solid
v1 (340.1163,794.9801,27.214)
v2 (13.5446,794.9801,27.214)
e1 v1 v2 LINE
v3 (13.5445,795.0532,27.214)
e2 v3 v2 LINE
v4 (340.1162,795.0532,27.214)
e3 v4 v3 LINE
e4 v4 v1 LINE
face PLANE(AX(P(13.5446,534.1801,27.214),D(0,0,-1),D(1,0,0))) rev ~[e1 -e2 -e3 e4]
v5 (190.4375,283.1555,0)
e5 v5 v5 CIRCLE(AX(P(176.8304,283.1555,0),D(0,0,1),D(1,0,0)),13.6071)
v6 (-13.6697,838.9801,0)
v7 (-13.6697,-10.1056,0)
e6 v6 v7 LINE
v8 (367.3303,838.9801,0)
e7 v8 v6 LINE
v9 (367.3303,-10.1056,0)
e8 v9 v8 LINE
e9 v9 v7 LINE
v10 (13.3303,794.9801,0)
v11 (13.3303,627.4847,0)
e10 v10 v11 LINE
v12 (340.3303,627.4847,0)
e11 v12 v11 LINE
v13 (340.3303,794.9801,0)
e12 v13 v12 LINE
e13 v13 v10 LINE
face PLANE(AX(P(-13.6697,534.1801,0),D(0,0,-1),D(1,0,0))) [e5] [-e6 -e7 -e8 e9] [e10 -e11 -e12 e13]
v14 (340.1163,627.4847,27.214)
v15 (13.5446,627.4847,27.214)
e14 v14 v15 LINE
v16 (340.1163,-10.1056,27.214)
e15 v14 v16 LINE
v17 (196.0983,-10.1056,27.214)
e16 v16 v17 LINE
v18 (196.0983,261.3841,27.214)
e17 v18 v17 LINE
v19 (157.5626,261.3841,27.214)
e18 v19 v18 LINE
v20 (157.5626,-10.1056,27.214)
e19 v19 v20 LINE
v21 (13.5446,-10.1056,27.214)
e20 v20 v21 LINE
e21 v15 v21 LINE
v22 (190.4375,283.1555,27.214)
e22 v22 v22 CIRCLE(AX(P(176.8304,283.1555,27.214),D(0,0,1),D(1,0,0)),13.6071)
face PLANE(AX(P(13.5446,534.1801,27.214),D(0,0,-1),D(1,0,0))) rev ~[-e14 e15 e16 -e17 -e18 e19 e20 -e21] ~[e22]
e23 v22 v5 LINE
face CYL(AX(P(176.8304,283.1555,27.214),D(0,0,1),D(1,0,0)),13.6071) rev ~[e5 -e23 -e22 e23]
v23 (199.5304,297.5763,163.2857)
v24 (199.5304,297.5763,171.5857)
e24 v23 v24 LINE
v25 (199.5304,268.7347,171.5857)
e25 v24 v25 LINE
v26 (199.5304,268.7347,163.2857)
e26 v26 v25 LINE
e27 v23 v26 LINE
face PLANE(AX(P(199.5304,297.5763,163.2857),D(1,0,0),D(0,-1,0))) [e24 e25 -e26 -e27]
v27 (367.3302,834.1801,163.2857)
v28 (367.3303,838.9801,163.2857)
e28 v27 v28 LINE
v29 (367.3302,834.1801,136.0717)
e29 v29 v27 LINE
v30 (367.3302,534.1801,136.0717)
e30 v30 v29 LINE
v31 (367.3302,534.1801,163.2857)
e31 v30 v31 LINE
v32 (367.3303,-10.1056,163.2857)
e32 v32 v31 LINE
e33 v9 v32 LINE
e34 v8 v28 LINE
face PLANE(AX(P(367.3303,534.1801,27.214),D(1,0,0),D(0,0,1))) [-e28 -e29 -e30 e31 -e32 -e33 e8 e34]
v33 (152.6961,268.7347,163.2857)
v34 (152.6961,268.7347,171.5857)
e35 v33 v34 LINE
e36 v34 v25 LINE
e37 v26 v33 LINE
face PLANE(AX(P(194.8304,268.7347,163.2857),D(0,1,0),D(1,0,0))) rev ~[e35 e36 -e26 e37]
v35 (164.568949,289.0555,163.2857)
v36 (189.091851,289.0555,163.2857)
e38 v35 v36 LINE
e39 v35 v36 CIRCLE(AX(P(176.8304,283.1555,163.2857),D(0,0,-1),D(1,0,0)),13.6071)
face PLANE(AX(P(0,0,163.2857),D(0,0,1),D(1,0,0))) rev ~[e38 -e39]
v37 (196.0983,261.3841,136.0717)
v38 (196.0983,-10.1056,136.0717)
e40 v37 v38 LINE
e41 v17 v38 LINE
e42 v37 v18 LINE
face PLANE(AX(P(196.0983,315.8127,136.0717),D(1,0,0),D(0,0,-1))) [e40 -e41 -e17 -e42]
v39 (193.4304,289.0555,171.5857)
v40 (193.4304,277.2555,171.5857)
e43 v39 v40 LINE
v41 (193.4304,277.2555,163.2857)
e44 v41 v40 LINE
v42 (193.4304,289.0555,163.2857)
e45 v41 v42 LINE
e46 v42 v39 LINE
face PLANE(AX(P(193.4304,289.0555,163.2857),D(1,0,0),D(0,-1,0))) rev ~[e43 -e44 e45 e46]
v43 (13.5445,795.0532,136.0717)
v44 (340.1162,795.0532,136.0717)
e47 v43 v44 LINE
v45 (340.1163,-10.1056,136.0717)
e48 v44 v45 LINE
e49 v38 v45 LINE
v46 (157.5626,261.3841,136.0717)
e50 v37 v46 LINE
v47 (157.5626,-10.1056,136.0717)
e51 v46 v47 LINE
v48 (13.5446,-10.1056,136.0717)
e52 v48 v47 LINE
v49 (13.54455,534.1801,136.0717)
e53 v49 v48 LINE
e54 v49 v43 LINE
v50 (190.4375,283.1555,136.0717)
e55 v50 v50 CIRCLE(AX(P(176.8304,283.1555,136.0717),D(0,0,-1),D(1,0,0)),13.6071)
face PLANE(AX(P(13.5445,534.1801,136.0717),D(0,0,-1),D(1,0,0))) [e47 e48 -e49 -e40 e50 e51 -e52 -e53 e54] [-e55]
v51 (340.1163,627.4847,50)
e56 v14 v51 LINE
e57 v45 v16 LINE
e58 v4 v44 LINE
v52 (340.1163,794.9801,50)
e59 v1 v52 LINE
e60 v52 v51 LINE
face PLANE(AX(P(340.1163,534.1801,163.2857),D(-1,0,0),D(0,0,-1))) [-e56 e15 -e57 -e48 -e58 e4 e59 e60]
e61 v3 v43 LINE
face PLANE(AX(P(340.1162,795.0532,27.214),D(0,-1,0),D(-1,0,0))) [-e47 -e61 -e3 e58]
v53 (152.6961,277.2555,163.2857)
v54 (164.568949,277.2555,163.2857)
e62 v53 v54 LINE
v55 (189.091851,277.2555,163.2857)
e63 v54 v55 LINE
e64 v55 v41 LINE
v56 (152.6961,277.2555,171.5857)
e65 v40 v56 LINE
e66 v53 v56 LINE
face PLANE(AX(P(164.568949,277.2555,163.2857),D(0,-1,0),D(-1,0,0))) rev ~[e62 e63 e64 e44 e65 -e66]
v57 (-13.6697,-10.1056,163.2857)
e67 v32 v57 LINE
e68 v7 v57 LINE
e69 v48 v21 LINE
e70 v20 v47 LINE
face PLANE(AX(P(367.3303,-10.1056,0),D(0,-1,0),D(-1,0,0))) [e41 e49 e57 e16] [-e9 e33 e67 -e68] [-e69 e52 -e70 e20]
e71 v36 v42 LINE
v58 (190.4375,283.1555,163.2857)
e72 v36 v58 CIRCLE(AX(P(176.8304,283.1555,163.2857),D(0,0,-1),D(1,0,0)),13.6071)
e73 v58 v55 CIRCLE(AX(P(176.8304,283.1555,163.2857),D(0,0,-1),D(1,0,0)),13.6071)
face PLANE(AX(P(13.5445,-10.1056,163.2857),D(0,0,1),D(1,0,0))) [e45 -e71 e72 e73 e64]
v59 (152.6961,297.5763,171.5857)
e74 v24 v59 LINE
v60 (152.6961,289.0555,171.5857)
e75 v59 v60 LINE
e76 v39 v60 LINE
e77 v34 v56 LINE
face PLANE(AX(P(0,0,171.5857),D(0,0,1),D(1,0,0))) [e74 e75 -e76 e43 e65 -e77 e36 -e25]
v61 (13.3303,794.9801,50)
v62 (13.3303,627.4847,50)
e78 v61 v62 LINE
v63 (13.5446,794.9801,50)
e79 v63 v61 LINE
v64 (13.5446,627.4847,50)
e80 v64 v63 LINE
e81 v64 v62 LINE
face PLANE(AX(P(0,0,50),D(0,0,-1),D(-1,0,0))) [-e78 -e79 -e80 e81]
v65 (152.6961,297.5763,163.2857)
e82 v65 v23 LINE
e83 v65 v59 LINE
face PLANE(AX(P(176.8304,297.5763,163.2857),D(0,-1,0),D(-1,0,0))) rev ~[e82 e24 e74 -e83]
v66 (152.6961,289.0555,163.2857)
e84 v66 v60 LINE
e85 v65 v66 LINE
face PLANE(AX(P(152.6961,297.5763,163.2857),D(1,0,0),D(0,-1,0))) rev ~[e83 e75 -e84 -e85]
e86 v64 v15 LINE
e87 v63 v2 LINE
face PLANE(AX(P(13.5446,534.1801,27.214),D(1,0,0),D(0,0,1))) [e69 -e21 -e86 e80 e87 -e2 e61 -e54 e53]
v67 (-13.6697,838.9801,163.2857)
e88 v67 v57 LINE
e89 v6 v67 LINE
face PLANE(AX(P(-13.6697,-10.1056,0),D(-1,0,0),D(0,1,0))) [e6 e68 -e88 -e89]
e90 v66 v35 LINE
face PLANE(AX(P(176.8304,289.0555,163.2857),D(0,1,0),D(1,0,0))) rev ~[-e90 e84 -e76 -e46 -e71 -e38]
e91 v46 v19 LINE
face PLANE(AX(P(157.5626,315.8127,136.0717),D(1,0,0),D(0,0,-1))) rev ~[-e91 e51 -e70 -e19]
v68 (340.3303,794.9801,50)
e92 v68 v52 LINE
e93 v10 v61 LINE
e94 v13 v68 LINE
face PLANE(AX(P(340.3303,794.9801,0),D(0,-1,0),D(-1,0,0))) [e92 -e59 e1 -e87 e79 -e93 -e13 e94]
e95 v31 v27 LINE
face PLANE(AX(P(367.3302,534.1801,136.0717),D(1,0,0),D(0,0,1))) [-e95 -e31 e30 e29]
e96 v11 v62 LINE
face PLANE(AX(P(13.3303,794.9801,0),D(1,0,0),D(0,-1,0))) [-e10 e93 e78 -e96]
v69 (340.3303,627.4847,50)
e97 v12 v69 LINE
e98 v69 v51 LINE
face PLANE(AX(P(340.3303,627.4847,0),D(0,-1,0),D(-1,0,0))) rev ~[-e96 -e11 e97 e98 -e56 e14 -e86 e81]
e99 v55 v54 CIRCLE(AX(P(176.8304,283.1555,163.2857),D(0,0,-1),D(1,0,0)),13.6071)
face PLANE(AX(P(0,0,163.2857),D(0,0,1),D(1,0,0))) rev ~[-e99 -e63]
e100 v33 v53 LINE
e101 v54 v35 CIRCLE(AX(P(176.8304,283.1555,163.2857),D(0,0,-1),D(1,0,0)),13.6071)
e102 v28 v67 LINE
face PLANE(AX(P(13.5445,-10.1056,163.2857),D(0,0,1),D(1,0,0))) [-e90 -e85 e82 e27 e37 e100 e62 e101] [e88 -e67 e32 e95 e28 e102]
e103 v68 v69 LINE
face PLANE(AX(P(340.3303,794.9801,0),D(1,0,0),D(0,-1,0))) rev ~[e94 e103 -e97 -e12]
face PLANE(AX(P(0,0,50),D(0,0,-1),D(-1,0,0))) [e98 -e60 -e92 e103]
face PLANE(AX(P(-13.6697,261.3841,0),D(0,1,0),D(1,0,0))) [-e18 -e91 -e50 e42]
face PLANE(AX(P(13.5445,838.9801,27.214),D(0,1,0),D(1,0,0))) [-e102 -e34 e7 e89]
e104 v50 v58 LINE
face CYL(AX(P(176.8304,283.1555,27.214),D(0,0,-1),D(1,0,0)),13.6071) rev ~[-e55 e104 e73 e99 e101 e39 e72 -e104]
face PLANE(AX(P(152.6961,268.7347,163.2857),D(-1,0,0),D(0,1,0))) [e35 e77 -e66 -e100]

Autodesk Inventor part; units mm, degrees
ref_plane "YZ Plane" through (0, 0, 0) normal (1, 0, 0) x (0, 1, 0)
ref_plane "XZ Plane" through (0, 0, 0) normal (0, 1, 0) x (-1, 0, 0)
ref_plane "XY Plane" through (0, 0, 0) normal (0, 0, 1) x (1, 0, 0)
sketch "Sketch1" plane through (0, 0, 0) normal (0, 0, 1) x (1, 0, 0)
  line L0 (-13.6697, 534.1801) -> (367.3303, 534.1801)
  line L1 (367.3303, 534.1801) -> (367.3303, -10.1056)
  line L2 (367.3303, -10.1056) -> (-13.6697, -10.1056)
  line L3 (-13.6697, -10.1056) -> (-13.6697, 534.1801)
  point P0 (0, 0)
  dimension "d0" = 381
  dimension "d1" = 544.2857
extrude "Extrusion1" add sketch "Sketch1" along normal blind 163.2857
sketch "Sketch2" plane through (-13.6697, 534.1801, 0) normal (0, 1, 0) x (1, 0, 0)
  line L0 (27.2143, -136.0717) -> (353.786, -136.0717)
  line L1 (353.786, -136.0717) -> (353.786, -27.214)
  line L2 (353.786, -27.214) -> (27.2143, -27.214)
  line L3 (27.2143, -27.214) -> (27.2143, -136.0717)
  line L4 (0, 0) -> (0, -163.2857) projected
  line L5 (381, 0) -> (0, 0) projected
  line L6 (381, 0) -> (381, -163.2857) projected
  line L7 (381, -163.2857) -> (0, -163.2857) projected
  point P0 (13.6697, 0)
  dimension "d4" = 27.2143
  dimension "d5" = 27.214
  dimension "d6" = 27.214
  dimension "d7" = 27.214
extrude "Extrusion2" cut sketch "Sketch2" against normal blind 218.3674 contours L3 L2 L1 L0
sketch "Sketch3" plane through (-13.6697, 315.8127, 0) normal (0, 1, 0) x (1, 0, 0)
  line L0 (353.786, -27.214) -> (353.786, -136.0717) projected
  line L1 (27.2143, -27.214) -> (353.786, -27.214) projected
  line L2 (353.786, -136.0717) -> (209.768, -136.0717)
  line L3 (209.768, -136.0717) -> (209.768, -27.214)
  line L4 (209.768, -27.214) -> (353.786, -27.214)
  line L5 (353.786, -27.214) -> (353.786, -136.0717)
  line L6 (353.786, -136.0717) -> (27.2143, -136.0717) projected
  line L7 (27.2143, -136.0717) -> (171.2323, -136.0717)
  line L8 (171.2323, -136.0717) -> (171.2323, -27.214)
  line L9 (171.2323, -27.214) -> (27.2143, -27.214)
  line L10 (27.2143, -27.214) -> (27.2143, -136.0717)
  point P0 (13.6697, 0)
  point P1 (27.2143, -27.214)
  point P2 (171.2323, -27.214)
  dimension "d10" = 144.018
  dimension "d11" = 144.018
extrude "Extrusion3" cut sketch "Sketch3" against normal blind 436.0817 contours L0 L2 L3 L1 | L8 L6 L10 L1
sketch "Sketch4" plane through (-13.6697, 315.8127, 0) normal (0, 1, 0) x (1, 0, 0)
  line L0 (171.2323, -27.214) -> (209.768, -27.214) projected
  line L1 (209.768, -136.0717) -> (209.768, -27.214) projected
  line L2 (171.2323, -27.214) -> (209.768, -27.214)
  line L3 (209.768, -27.214) -> (209.768, -136.0717)
  line L4 (209.768, -136.0717) -> (171.2323, -136.0717)
  line L5 (171.2323, -136.0717) -> (171.2323, -27.214)
  point P0 (13.6697, 0)
extrude "Extrusion4" cut sketch "Sketch4" against normal blind 54.4286
sketch "Sketch5" plane through (13.5445, 534.1801, 27.214) normal (0, 0, 1) x (1, 0, 0)
  line L0 (144.018, -272.796) -> (182.5537, -272.796) projected
  line L1 (163.2859, -272.796) -> (163.2859, -37.2995) construction
  circle A0 centre (163.2859, -251.0246) radius 13.6071
  point P0 (-13.5445, -534.1801)
  dimension "d16" = 27.2143
  dimension "d17" = 21.7714
extrude "Extrusion5" cut sketch "Sketch5" along normal mid plane 489.8571
sketch "Sketch6" plane through (-13.6697, 534.1801, 0) normal (0, 1, 0) x (1, 0, 0)
  line L0 (381, -163.2857) -> (0, -163.2857) projected
  line L1 (0, 0) -> (0, -163.2857) projected
  line L2 (27.2143, -163.2857) -> (0, -163.2857)
  line L3 (0, -163.2857) -> (0, 0)
  line L4 (0, 0) -> (26.8469, 0)
  line L5 (27.2143, -27.214) -> (27.2143, -163.2857)
  line L6 (27.2143, -27.214) -> (353.786, -27.214) projected
  line L7 (381, 0) -> (381, -163.2857) projected
  line L8 (27.2143, -27.214) -> (353.786, -27.214)
  line L9 (381, -27.214) -> (381, 0)
  line L10 (381, 0) -> (27.2143, 0)
  line L11 (381, 0) -> (0, 0) projected
  line L12 (381, -163.2857) -> (353.786, -163.2857)
  line L13 (353.786, -163.2857) -> (353.786, -27.214)
  line L14 (353.786, 0) -> (381, 0)
  line L15 (381, 0) -> (381, -163.2857)
  line L16 (27.2143, -27.214) -> (27.2143, -136.0717) projected
  line L17 (27.2143, -163.2857) -> (27.2143, -27.214)
  line L18 (27.2143, -27.214) -> (353.786, -27.214)
  line L19 (353.786, -136.0717) -> (353.786, -27.214) projected
  line L20 (353.786, -27.214) -> (353.786, -163.2857)
  point P0 (13.6697, 0)
extrude "Extrusion6" add sketch "Sketch6" along normal blind 304.8 contours L0 L13 L6 L5 L1 L4 L11 L10 L7
sketch "Sketch7" plane through (13.5445, -10.1056, 27.214) normal (0, 0, 1) x (1, 0, 0)
  line L0 (-27.2143, 849.0857) -> (0, 849.0857) projected
  line L1 (326.5717, 849.0857) -> (326.5717, 0) projected
  line L2 (0, 849.0857) -> (326.5717, 849.0857)
  line L3 (326.5717, 849.0857) -> (326.5717, 805.1588)
  line L4 (326.5717, 805.1588) -> (0, 805.1588)
  line L5 (0, 805.1588) -> (0, 849.0857)
  point P0 (-13.5445, 10.1056)
extrude "Extrusion7" add sketch "Sketch7" along normal up to surface (136.0717 mm away)
sketch "Sketch8" plane through (13.5445, 534.1801, 163.2857) normal (0, 1, 0) x (1, 0, 0)
  line L0 (0, 27.214) -> (144.018, 27.214) projected
  line L1 (0, 27.214) -> (353.7857, 27.214)
  line L2 (353.7857, 27.214) -> (353.7857, 0)
  line L3 (353.7857, 0) -> (0, 0)
  line L4 (0, 0) -> (0, 27.214)
  point P0 (-13.5445, 163.2857)
  point P1 (144.018, 27.214)
extrude "Extrusion8" add sketch "Sketch8" along normal blind 300
sketch "Sketch9" plane through (0, 0, 0) normal (0, 0, -1) x (-1, 0, 0)
  line L0 (-340.3303, 794.9801) -> (-13.3303, 794.9801)
  line L1 (-13.3303, 794.9801) -> (-13.3303, 627.4847)
  line L2 (-340.3303, 794.9801) -> (-340.3303, 627.4847)
  line L3 (-340.3303, 627.4847) -> (-13.3303, 627.4847)
  line L4 (-367.3303, 838.9801) -> (13.6697, 838.9801) projected
  line L5 (13.6697, -10.1056) -> (13.6697, 838.9801) projected
  line L6 (-367.3303, -10.1056) -> (-367.3303, 838.9801) projected
  point P0 (0, 0)
  dimension "d26" = 44
  dimension "d27" = 27
  dimension "d28" = 27
extrude "Extrusion9" cut sketch "Sketch9" against normal blind 50
sketch "Sketch10" plane through (0, 0, 0) normal (0, 0, -1) x (-1, 0, 0)
  point P0 (0, 0)
sketch "Sketch11" plane through (340.3303, 627.4847, 0) normal (-1, 0, 0) x (0, 0, 1)
  point P0 (0, -627.4847)
sketch "Sketch12" plane through (0, 0, 163.2857) normal (0, 0, 1) x (1, 0, 0)
  circle A0 centre (176.8304, 283.1555) radius 13.6071 projected
  line L0 (194.8304, 297.5763) -> (176.8304, 297.5763)
  line L1 (194.8304, 297.5763) -> (199.5304, 297.5763)
  line L2 (199.5304, 297.5763) -> (199.5304, 268.7347)
  line L3 (176.8304, 297.5763) -> (152.6961, 297.5763)
  line L4 (152.6961, 297.5763) -> (152.6961, 289.0555)
  line L5 (176.8304, 283.1555) -> (176.8304, 289.0555) construction
  line L6 (176.8304, 289.0555) -> (193.4304, 289.0555)
  line L7 (193.4304, 289.0555) -> (193.4304, 285.8555)
  line L8 (176.8304, 289.0555) -> (152.6961, 289.0555)
  line L9 (176.8304, 283.1555) -> (183.0707, 283.1555) construction
  line L10 (194.8304, 268.7347) -> (176.8304, 268.7347)
  line L11 (176.8304, 268.7347) -> (152.6961, 268.7347)
  line L12 (152.6961, 268.7347) -> (152.6961, 277.2555)
  line L13 (176.8304, 277.2555) -> (193.4304, 277.2555)
  line L14 (176.8304, 277.2555) -> (152.6961, 277.2555)
  line L15 (194.8304, 268.7347) -> (199.5304, 268.7347)
  line L16 (193.4304, 277.2555) -> (193.4304, 285.8555)
  point P0 (0, 0)
  dimension "d35" = 5.9
extrude "Extrusion10" add sketch "Sketch12" along normal blind 8.3 contours L6 L8 A0 | A0 L8 L4 L3 L0 L1 L2 L15 L10 L11 L12 L14 L13 L16 L7 L6 | A0 L14 L13
properties part number "ENGR131 KC Design 2"
